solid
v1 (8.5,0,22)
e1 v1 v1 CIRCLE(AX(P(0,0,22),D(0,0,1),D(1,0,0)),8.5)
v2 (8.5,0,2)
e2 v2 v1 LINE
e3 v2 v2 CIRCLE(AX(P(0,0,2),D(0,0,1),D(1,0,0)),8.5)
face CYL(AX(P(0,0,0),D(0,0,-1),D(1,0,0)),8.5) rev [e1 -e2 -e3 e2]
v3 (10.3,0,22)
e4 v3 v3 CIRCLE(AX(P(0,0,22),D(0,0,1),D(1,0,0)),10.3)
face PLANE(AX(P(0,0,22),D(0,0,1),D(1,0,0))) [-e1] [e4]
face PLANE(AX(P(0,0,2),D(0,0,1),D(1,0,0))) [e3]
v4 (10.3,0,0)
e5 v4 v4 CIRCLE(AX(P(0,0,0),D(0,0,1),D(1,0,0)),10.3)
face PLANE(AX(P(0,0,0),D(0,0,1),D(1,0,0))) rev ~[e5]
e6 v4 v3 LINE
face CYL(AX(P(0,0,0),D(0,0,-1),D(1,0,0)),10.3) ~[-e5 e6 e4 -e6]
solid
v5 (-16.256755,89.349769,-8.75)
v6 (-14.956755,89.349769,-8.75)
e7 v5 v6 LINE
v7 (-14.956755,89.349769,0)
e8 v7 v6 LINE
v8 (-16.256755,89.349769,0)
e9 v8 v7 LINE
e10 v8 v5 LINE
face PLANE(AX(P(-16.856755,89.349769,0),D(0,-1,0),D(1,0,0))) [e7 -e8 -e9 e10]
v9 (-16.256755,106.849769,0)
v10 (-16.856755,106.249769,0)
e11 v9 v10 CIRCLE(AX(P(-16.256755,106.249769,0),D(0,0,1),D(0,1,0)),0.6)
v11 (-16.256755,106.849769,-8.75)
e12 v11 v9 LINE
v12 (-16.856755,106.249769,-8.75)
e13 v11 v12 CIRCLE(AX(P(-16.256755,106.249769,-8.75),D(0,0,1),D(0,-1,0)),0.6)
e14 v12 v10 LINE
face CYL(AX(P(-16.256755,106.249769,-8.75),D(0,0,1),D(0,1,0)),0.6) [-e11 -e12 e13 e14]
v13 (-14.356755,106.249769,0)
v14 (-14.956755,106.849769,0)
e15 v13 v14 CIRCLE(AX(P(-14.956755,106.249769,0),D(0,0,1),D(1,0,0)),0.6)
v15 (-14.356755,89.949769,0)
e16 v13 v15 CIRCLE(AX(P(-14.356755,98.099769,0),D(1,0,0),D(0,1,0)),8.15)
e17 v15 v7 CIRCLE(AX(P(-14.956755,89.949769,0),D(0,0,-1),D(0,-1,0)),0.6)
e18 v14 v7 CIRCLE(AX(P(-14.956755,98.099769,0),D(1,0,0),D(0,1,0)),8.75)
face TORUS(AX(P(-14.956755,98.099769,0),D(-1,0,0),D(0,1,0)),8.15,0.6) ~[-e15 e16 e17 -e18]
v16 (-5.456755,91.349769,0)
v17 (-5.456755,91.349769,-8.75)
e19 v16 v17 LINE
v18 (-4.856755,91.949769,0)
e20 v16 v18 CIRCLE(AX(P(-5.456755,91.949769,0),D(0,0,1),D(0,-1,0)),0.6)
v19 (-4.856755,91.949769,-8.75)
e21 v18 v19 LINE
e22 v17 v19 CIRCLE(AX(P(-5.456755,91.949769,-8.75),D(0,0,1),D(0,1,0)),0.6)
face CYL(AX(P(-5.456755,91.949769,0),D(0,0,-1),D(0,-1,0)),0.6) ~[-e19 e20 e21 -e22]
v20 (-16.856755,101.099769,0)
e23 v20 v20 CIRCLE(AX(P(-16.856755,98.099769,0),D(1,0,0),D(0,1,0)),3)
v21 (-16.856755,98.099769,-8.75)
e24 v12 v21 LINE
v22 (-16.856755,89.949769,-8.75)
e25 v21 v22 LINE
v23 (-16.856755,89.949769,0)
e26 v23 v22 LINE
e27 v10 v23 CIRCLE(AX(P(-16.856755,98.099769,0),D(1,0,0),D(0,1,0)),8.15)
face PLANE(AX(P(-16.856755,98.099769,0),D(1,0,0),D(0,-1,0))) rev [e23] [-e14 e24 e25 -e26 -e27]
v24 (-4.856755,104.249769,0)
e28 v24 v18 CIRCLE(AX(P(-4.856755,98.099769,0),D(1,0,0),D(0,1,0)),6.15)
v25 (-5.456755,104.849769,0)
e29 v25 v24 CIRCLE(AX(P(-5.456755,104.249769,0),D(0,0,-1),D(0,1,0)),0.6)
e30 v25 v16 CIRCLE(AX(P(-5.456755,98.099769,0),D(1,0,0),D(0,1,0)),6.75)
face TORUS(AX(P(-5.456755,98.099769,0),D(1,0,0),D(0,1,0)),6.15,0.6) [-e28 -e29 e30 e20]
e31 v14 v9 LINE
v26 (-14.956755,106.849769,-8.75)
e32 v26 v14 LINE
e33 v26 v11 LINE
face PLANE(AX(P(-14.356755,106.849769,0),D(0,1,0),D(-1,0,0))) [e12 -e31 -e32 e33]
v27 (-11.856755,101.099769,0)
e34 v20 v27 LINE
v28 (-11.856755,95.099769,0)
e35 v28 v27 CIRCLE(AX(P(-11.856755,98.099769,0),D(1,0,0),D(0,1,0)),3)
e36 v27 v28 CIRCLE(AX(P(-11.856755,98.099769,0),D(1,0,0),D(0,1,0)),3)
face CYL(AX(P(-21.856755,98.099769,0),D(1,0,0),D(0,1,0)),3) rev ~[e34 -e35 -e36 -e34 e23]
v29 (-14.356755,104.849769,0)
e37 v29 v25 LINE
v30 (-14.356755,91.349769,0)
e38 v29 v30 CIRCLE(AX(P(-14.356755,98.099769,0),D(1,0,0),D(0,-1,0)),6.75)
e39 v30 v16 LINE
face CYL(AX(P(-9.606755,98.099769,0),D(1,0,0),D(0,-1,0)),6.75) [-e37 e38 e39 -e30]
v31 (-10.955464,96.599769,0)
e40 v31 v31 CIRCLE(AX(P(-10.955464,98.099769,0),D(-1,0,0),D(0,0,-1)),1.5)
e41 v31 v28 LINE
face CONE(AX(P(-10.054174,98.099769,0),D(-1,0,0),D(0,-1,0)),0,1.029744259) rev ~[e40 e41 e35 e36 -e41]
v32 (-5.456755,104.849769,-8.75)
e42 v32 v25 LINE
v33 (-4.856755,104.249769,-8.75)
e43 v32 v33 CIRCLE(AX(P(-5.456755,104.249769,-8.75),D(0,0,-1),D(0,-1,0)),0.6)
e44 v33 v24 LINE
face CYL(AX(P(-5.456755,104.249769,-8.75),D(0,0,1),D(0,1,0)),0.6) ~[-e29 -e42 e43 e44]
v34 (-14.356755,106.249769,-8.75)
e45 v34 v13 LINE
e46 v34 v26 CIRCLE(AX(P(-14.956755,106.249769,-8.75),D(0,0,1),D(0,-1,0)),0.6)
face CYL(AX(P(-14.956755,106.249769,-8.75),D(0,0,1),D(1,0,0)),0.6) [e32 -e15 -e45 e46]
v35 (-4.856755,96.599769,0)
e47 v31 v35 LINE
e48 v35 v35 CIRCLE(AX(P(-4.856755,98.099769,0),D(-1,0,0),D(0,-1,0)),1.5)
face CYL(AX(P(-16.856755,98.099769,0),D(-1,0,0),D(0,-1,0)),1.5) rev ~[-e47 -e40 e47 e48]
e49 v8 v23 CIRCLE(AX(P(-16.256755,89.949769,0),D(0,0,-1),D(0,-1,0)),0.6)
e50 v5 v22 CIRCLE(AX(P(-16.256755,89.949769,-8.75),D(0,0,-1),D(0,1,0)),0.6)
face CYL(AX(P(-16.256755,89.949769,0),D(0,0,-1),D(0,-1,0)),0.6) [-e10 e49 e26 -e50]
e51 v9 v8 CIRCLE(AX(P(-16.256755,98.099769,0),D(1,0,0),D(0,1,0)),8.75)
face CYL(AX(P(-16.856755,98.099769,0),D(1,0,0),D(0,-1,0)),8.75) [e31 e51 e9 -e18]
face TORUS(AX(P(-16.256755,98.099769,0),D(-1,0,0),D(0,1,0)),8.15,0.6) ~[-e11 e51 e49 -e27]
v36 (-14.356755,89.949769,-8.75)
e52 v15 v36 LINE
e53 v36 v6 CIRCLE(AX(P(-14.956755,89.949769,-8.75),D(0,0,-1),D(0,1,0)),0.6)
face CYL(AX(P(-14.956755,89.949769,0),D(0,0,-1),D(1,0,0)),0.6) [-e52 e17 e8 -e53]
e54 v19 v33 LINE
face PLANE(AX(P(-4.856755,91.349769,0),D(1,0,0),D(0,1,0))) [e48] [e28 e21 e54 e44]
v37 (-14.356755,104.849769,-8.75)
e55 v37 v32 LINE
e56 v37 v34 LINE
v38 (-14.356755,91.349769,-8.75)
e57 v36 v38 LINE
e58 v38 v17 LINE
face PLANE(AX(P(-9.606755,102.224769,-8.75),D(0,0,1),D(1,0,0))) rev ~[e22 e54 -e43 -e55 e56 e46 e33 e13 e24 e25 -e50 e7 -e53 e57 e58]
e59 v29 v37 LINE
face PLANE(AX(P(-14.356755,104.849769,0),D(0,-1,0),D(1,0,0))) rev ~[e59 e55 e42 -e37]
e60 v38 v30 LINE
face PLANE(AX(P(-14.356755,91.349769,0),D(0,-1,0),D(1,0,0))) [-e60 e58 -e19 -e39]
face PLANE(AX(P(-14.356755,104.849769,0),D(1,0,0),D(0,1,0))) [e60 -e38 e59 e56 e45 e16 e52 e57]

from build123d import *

# Parameters (mm, degrees)
F0_R     = 8.5
F1_DEPTH = 2
F0_R_2   = 10.3
F2_DEPTH = 22
F0_W     = 9.5
F0_H     = 5.25
F0_W_2   = 2.5
F0_H_2   = 1.5
F3_DEPTH = 8.75
F5_R     = 1.5
F6_DEPTH = 27.1577554153
F7_R     = 0.6
F8_D     = 6
F8_DEPTH = 5
F8_TIP   = 1.8025818571


with BuildPart() as f1:
    # F0 (on Top) → F1 (new body)
    with BuildSketch(Plane.XY):
        Circle(F0_R)
    extrude(amount=F1_DEPTH)

    # F0 (on Top) → F2 (join)
    with BuildSketch(Plane.XY):
        Circle(F0_R_2)
        Circle(F0_R, mode=Mode.SUBTRACT)
    extrude(amount=F2_DEPTH)


with BuildPart() as f3:
    # F0 (on Top) → F3 (new body)
    with BuildSketch(Plane.XY):
        with Locations((-9.6067554153, 102.2247694518)):
            Rectangle(F0_W, F0_H)
        Polygon((-16.8567554153, 99.5997694518), (-14.3567554153, 99.5997694518), (-14.3567554153, 104.8497694518), (-14.3567554153, 106.8497694518), (-16.8567554153, 106.8497694518), align=None)
        with Locations((-15.6067554153, 97.3497694518)):
            Rectangle(F0_W_2, F0_H_2)
        with Locations((-15.6067554153, 98.8497694518)):
            Rectangle(F0_W_2, F0_H_2)
        with Locations((-9.6067554153, 97.3497694518)):
            Rectangle(F0_W, F0_H_2)
        with Locations((-9.6067554153, 98.8497694518)):
            Rectangle(F0_W, F0_H_2)
        with Locations((-9.6067554153, 93.9747694518)):
            Rectangle(F0_W, F0_H)
        Polygon((-14.3567554153, 89.3497694518), (-14.3567554153, 91.3497694518), (-14.3567554153, 96.5997694518), (-16.8567554153, 96.5997694518), (-16.8567554153, 89.3497694518), align=None)
    extrude(amount=-F3_DEPTH)

    # F0 (on Top) → F4 (revolve)
    with BuildSketch(Plane.XY):
        with Locations((-9.6067554153, 97.3497694518)):
            Rectangle(F0_W, F0_H_2)
        with Locations((-15.6067554153, 97.3497694518)):
            Rectangle(F0_W_2, F0_H_2)
        Polygon((-14.3567554153, 89.3497694518), (-14.3567554153, 91.3497694518), (-14.3567554153, 96.5997694518), (-16.8567554153, 96.5997694518), (-16.8567554153, 89.3497694518), align=None)
        with Locations((-9.6067554153, 93.9747694518)):
            Rectangle(F0_W, F0_H)
    revolve(axis=Axis((-10.8567554153, 98.0997694518, 0), (1, 0, 0)))

    # F5 (on face) → F6 (cut, through all)
    with BuildSketch(Plane(origin=(-16.8567554153, 0, 0), x_dir=(0, -1, 0), z_dir=(-1, 0, 0))):
        with Locations((-98.0997694518, 0)):
            Circle(F5_R)
    extrude(amount=-F6_DEPTH, mode=Mode.SUBTRACT)

    # F7
    f7_edges = [f3.edges().sort_by_distance(p)[0] for p in [
        (-16.856755, 89.349769, -4.375),
        (-16.856755, 106.849769, -4.375),
        (-15.606755, 98.099769, -8.75),
        (-14.356755, 89.349769, -4.375),
        (-14.356755, 106.849769, -4.375),
        (-4.856755, 91.349769, -4.375),
        (-4.856755, 98.099769, 6.75),
        (-4.856755, 104.849769, -4.375),
        (-14.356755, 98.099769, 8.75),
        (-16.856755, 98.099769, 8.75),
    ]]
    fillet(f7_edges, radius=F7_R)

    # F8
    with Locations(Plane(origin=(-16.8567554153, 0, 0), x_dir=(0, -1, 0), z_dir=(-1, 0, 0))):
        with Locations((-98.0997694518, 0)):
            Hole(F8_D / 2, depth=F8_DEPTH)
            with Locations((0, 0, -(F8_DEPTH + F8_TIP / 2))):  # 118° drill point
                Cone(0, F8_D / 2, F8_TIP, mode=Mode.SUBTRACT)


solid = Compound([f1.part, f3.part])
